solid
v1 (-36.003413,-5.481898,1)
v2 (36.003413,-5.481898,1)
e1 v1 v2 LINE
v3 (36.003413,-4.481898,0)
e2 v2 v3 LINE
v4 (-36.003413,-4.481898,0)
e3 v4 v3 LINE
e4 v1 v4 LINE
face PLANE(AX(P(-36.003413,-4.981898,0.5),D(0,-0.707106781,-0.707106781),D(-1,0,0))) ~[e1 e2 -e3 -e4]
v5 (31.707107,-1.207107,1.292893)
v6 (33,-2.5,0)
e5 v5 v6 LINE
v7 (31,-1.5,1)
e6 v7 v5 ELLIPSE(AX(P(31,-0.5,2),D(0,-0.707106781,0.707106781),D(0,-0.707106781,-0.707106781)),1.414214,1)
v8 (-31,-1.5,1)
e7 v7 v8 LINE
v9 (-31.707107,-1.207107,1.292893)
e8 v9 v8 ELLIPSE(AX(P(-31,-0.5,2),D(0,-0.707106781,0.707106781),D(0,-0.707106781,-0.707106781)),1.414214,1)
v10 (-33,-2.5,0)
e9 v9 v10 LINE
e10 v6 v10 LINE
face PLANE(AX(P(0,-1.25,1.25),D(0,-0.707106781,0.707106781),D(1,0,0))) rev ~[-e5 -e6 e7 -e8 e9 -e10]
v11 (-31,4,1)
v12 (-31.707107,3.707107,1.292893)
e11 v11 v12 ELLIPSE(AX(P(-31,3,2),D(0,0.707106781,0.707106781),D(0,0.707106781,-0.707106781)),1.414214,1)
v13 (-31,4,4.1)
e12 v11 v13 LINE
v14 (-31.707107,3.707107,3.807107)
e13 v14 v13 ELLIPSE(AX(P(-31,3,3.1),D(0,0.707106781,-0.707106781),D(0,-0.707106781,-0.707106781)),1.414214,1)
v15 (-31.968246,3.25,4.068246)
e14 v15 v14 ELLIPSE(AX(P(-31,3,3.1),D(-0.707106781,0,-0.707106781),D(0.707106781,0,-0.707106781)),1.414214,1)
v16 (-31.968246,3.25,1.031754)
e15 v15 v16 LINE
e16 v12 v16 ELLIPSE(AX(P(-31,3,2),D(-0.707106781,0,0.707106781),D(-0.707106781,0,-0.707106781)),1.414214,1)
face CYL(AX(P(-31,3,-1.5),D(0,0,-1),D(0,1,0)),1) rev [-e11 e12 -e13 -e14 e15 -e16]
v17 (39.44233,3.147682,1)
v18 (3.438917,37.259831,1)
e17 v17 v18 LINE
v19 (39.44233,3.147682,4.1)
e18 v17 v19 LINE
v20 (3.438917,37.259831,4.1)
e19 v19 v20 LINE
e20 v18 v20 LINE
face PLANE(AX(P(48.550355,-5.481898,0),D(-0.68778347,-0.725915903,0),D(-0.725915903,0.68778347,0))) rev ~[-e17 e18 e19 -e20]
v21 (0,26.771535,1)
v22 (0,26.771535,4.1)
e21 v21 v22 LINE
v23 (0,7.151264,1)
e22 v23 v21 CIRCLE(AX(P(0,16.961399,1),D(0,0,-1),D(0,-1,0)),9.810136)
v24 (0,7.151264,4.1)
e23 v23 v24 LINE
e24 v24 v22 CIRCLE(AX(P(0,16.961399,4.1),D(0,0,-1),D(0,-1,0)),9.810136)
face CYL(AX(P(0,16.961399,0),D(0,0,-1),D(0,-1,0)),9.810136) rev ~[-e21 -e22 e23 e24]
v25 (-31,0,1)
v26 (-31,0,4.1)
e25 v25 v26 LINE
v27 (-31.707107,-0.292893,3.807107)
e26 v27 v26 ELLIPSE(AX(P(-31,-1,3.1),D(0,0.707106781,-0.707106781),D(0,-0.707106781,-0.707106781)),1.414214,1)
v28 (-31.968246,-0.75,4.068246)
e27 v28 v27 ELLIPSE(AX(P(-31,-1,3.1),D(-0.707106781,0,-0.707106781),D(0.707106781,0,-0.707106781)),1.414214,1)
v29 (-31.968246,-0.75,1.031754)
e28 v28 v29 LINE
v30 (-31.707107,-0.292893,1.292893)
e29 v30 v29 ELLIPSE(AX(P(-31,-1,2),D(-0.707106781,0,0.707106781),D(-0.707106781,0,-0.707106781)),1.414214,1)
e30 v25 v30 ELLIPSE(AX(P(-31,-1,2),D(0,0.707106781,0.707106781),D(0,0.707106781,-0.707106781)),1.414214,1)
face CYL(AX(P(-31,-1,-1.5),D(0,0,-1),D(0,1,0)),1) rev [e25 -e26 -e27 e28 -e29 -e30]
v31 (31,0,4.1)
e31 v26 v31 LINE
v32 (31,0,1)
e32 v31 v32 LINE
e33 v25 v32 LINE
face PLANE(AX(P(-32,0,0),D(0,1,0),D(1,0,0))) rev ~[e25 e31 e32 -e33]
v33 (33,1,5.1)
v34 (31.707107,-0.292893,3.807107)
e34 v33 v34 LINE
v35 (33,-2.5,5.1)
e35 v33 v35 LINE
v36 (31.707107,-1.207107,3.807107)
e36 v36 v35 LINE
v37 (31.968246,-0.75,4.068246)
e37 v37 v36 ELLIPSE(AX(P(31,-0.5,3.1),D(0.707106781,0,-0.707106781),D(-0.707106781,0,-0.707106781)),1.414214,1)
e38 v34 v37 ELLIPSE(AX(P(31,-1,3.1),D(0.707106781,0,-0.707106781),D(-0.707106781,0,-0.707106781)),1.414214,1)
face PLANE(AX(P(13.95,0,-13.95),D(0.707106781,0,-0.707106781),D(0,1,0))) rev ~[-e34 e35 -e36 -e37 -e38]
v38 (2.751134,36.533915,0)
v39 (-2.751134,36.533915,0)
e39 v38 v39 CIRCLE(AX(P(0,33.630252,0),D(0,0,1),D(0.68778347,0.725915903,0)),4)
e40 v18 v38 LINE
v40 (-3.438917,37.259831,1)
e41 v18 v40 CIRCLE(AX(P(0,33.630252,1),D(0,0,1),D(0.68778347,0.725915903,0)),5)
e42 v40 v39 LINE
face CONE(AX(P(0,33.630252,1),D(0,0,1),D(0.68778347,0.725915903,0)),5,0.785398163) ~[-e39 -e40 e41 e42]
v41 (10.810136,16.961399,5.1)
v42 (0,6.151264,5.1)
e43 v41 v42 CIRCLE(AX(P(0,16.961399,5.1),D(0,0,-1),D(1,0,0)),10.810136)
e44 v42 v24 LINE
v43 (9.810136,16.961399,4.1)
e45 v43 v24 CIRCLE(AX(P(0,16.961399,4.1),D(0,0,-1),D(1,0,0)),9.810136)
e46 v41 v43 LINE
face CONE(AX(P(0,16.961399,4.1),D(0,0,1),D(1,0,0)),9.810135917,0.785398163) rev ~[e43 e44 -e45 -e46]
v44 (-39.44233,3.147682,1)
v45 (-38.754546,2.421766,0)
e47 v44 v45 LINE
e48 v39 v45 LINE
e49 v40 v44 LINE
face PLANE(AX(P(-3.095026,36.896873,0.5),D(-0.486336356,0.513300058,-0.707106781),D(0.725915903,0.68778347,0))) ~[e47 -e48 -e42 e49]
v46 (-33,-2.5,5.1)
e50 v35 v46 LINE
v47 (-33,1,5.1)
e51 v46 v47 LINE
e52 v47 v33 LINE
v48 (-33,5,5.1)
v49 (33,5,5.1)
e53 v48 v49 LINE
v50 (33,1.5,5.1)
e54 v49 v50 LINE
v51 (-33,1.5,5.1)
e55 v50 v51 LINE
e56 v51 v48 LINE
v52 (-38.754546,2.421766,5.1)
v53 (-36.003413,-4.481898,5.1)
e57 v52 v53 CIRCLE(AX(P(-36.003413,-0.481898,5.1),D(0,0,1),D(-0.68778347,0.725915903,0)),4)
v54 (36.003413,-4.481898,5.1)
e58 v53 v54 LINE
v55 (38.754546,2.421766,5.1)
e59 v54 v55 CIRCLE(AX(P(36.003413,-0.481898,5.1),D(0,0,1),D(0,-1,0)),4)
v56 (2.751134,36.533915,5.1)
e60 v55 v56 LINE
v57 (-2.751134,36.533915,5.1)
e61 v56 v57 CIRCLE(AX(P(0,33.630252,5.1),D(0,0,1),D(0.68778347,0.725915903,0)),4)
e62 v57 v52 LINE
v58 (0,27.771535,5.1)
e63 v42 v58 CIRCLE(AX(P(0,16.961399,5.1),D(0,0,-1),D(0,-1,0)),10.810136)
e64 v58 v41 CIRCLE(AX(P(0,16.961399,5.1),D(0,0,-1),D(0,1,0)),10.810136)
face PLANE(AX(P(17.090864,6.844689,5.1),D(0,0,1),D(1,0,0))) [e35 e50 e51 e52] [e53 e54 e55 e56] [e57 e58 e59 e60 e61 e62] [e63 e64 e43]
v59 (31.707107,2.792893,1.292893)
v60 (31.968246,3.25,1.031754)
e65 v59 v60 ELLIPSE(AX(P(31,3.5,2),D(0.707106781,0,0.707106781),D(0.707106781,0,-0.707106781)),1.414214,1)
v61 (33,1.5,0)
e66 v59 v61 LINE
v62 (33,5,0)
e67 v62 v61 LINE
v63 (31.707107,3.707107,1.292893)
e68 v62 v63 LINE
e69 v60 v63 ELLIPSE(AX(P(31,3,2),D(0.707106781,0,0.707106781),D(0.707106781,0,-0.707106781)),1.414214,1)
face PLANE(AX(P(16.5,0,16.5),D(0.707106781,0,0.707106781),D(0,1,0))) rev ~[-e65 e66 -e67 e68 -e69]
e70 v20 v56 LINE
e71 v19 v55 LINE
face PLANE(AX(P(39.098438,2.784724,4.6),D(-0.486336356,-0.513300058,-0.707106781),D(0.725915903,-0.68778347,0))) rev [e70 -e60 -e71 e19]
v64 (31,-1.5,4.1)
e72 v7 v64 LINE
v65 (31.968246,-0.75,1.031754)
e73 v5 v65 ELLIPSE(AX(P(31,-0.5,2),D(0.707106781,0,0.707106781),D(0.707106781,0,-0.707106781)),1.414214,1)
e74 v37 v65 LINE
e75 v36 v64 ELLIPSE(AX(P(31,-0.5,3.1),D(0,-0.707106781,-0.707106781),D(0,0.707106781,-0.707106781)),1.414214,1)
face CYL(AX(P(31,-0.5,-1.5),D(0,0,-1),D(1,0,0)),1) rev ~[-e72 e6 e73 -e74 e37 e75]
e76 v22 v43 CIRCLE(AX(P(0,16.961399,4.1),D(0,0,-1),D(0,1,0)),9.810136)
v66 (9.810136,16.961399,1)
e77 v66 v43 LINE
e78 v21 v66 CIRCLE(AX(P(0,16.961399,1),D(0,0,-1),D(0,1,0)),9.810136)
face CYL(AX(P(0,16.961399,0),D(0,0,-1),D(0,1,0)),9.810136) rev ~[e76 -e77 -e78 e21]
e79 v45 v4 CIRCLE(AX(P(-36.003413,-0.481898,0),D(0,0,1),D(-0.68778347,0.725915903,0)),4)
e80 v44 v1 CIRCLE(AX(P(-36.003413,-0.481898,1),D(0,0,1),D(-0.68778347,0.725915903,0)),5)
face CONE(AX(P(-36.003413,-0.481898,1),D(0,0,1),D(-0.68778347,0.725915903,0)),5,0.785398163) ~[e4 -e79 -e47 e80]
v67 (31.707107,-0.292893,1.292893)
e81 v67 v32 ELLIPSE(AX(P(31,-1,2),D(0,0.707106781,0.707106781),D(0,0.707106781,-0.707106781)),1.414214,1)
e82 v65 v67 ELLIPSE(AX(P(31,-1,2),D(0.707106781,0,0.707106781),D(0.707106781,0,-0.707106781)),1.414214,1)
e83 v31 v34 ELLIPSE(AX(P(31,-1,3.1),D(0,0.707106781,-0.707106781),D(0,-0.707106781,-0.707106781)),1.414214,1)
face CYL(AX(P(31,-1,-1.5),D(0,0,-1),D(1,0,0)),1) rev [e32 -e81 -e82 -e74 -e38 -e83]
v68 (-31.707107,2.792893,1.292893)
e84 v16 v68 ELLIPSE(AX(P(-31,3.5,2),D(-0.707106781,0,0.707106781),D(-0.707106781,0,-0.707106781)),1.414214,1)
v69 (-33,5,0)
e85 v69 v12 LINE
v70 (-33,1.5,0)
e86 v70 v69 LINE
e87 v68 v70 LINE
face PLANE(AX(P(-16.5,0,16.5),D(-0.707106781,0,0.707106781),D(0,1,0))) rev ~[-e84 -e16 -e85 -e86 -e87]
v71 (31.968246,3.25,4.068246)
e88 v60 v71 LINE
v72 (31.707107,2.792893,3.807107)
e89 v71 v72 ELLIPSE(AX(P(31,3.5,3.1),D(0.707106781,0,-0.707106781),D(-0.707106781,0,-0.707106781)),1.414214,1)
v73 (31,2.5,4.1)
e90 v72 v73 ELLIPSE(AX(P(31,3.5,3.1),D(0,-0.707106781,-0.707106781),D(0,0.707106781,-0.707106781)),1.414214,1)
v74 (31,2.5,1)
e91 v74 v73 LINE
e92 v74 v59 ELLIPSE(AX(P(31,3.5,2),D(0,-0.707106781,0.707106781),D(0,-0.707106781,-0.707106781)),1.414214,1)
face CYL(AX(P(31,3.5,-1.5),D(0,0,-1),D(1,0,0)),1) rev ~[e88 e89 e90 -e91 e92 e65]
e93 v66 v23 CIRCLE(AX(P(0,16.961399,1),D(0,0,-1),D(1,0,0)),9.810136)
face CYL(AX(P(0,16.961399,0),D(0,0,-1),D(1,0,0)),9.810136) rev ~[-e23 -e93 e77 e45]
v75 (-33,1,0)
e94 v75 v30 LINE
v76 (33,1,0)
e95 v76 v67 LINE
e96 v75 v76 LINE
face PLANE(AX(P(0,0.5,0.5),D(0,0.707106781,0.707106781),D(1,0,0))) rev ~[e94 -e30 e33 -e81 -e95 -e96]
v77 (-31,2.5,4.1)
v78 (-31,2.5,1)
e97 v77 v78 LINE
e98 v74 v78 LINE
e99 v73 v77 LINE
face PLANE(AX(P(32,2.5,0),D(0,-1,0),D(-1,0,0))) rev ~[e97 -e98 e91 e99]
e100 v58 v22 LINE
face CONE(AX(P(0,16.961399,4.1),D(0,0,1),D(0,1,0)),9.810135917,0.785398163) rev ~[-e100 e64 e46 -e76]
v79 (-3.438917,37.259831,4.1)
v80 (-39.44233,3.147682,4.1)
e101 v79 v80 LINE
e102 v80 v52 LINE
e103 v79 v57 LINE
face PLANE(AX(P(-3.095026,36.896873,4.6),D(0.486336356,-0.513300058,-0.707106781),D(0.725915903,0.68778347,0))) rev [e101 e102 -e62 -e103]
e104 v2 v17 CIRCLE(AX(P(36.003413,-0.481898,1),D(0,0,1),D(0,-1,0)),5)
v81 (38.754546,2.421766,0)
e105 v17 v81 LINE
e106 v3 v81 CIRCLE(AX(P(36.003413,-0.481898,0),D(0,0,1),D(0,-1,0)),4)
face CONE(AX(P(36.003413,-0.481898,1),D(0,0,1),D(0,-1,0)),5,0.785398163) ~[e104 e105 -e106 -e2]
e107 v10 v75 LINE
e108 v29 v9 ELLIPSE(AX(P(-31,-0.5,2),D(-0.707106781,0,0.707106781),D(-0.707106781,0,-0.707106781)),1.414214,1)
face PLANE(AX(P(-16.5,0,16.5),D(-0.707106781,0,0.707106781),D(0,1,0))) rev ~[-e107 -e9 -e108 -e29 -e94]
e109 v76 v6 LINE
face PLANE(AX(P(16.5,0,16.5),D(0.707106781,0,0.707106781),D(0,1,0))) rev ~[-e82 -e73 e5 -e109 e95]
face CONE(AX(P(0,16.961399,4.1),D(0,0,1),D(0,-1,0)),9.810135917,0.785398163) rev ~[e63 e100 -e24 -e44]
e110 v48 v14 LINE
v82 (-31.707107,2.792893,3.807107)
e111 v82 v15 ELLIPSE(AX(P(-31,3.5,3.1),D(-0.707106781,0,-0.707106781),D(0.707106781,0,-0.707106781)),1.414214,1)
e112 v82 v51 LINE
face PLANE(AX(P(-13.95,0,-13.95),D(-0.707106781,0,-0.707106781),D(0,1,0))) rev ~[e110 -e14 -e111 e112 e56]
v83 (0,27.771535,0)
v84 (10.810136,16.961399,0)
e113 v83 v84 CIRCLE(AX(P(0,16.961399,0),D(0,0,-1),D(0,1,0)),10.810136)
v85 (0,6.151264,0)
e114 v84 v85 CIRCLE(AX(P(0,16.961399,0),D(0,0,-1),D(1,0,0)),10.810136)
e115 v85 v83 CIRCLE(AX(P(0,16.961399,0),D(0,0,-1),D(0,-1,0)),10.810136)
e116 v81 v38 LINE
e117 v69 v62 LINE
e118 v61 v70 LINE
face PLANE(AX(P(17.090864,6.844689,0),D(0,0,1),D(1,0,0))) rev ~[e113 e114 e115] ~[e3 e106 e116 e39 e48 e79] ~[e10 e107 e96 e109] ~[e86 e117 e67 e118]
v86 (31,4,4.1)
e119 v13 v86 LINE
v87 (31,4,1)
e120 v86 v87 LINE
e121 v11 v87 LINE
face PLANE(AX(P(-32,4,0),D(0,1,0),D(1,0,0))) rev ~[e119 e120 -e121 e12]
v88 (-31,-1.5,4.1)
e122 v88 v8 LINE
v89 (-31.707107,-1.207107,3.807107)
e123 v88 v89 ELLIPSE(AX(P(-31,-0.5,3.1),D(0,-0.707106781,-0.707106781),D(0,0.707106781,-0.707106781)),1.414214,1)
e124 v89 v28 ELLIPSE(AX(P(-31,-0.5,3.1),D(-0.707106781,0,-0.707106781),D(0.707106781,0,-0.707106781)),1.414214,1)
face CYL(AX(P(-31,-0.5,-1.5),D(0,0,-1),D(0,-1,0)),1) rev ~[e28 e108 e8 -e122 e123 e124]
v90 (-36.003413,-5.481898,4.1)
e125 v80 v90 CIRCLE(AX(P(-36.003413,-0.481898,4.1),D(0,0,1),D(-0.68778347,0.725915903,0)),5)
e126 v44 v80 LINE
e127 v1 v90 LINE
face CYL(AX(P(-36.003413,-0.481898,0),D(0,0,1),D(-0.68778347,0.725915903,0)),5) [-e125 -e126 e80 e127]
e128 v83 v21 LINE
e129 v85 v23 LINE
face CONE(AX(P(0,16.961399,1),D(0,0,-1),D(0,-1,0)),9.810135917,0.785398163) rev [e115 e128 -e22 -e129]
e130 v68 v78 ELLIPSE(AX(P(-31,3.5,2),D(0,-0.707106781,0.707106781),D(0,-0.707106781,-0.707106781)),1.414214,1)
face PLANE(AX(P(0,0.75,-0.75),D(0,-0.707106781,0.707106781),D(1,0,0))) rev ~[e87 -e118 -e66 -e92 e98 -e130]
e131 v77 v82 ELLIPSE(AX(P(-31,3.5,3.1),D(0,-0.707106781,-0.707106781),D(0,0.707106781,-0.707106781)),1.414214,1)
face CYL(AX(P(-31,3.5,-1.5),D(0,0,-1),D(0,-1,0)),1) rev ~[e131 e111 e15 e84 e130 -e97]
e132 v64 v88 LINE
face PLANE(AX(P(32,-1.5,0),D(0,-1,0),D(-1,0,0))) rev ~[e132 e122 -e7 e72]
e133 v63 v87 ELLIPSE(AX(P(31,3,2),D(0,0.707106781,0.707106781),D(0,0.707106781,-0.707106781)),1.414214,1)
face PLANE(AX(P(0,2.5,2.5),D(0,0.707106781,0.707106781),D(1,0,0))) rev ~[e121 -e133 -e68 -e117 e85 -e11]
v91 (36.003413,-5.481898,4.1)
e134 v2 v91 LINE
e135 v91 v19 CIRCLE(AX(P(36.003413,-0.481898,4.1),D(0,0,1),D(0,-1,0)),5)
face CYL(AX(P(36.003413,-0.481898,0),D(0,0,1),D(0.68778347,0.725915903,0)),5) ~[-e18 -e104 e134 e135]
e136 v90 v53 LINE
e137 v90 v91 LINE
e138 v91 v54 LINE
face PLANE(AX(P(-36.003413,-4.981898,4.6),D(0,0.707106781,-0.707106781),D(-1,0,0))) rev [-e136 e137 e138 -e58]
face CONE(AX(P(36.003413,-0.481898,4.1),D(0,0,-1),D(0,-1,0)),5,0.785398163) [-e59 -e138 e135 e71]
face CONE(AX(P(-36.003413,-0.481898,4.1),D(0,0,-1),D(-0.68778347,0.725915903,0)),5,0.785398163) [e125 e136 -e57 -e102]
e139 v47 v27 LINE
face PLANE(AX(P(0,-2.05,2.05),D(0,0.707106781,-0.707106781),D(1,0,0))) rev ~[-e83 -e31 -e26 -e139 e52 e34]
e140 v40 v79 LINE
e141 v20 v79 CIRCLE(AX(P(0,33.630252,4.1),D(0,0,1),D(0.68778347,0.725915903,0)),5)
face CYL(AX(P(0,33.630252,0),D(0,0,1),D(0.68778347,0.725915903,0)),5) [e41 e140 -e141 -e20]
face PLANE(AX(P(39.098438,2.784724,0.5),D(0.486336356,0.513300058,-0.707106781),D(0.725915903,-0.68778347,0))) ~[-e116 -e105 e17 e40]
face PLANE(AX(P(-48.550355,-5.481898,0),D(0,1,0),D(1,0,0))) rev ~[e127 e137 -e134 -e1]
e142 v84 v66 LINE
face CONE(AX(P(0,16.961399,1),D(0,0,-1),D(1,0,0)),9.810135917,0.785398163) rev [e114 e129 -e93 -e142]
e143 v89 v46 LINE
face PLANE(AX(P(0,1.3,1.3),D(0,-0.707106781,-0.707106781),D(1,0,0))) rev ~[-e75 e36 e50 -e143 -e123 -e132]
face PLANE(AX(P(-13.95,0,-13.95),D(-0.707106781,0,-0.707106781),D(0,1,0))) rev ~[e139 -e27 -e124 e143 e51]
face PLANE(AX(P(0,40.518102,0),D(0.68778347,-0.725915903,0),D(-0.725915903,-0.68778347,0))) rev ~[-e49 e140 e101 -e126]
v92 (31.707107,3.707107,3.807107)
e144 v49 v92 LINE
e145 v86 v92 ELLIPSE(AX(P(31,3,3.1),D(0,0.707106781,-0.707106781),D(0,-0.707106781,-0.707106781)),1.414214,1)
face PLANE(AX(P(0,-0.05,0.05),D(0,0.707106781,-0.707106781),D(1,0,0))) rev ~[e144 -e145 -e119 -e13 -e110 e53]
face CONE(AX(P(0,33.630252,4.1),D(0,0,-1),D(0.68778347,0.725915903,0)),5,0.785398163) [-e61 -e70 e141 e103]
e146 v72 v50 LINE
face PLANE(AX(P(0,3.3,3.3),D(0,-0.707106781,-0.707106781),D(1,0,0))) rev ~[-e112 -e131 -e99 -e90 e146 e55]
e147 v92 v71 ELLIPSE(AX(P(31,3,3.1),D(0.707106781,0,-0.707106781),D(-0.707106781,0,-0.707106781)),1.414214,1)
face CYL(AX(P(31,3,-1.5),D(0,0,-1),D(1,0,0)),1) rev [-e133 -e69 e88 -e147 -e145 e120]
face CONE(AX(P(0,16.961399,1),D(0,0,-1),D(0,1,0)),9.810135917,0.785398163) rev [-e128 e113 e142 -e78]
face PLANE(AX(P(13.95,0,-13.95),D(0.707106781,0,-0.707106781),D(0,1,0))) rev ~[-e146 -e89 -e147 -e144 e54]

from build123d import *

# Parameters (mm, degrees)
F1_DEPTH      = 5.1
F2_R          = 5
F3_SIZE       = 1
F4_T4_DEPTH   = 8.1
F4_T10_DEPTH  = 8.1
F4_T16_DEPTH  = 8.1
F4_T24_DEPTH  = 8.1
F4_T30_DEPTH  = 8.1
F4_T36_DEPTH  = 8.1
F4_T42_DEPTH  = 8.1
F4_T48_DEPTH  = 8.1
F4_T56_DEPTH  = 8.1
F4_T62_DEPTH  = 8.1
F4_T68_DEPTH  = 8.1
F4_T74_DEPTH  = 8.1
F4_T80_DEPTH  = 8.1
F4_T88_DEPTH  = 8.1
F4_T94_DEPTH  = 8.1
F4_T100_DEPTH = 8.1
F4_T106_DEPTH = 8.1
F4_T112_DEPTH = 8.1
F4_T120_DEPTH = 8.1
F4_T126_DEPTH = 8.1
F4_T132_DEPTH = 8.1
F4_T138_DEPTH = 8.1
F4_T144_DEPTH = 8.1
F4_T152_DEPTH = 8.1
F4_T158_DEPTH = 8.1
F4_T164_DEPTH = 8.1
F4_T170_DEPTH = 8.1
F4_T176_DEPTH = 8.1
F4_T184_DEPTH = 8.1
F4_T190_DEPTH = 8.1
F4_T196_DEPTH = 8.1
F4_T202_DEPTH = 8.1
F4_T208_DEPTH = 8.1
F4_T216_DEPTH = 8.1
F4_T222_DEPTH = 8.1
F4_T228_DEPTH = 8.1
F4_T234_DEPTH = 8.1
F4_T240_DEPTH = 8.1
F4_T248_DEPTH = 8.1
F4_T254_DEPTH = 8.1


# Not quite as in the source:
# - a fillet or chamfer that OpenCascade refuses, or shapes differently, is made with other operations: its cross-section is extruded or revolved along the edge and cut away or added


with BuildPart() as f1:
    # F0 (on Top) → F1 (new body)
    with BuildSketch(Plane.XY):
        with BuildLine():
            Line((0, 2.5), (0, 0))
            Line((0, 0), (32, 0))
            Line((32, 0), (32, -1.5))
            Line((32, -1.5), (0, -1.5))
            Line((0, -1.5), (0, -5.4818979414))
            Line((0, -5.4818979414), (48.5503548798, -5.4818979414))
            Line((48.5503548798, -5.4818979414), (0, 40.5181020586))
            Line((0, 40.5181020586), (0, 26.7715353826))
            ThreePointArc((0, 26.7715353826), (6.9368136311, 23.8982130969), (9.8101359168, 16.9613994658))
            ThreePointArc((9.8101359168, 16.9613994658), (6.9368136311, 10.0245858347), (0, 7.151263549))
            Line((0, 7.151263549), (0, 4))
            Line((0, 4), (32, 4))
            Line((32, 4), (32, 2.5))
            Line((32, 2.5), (0, 2.5))
        make_face()
        with BuildLine():
            Line((-32, -1.5), (-32, 0))
            Line((-32, 0), (0, 0))
            Line((0, 0), (0, 2.5))
            Line((0, 2.5), (-32, 2.5))
            Line((-32, 2.5), (-32, 4))
            Line((-32, 4), (0, 4))
            Line((0, 4), (0, 7.151263549))
            ThreePointArc((0, 7.151263549), (-9.8101359168, 16.9613994658), (0, 26.7715353826))
            Line((0, 26.7715353826), (0, 40.5181020586))
            Line((0, 40.5181020586), (-48.5503548798, -5.4818979414))
            Line((-48.5503548798, -5.4818979414), (0, -5.4818979414))
            Line((0, -5.4818979414), (0, -1.5))
            Line((0, -1.5), (-32, -1.5))
        make_face()
    extrude(amount=F1_DEPTH)

    # F2
    f2_edges = [f1.edges().sort_by_distance(p)[0] for p in [
        (-48.550355, -5.481898, 2.55),
        (48.550355, -5.481898, 2.55),
        (0, 40.518102, 2.55),
    ]]
    fillet(f2_edges, radius=F2_R)

    # F3
    f3_edges = [f1.edges().sort_by_distance(p)[0] for p in [
        (21.440624, 20.203756, 5.1),
        (40.648189, -2.332857, 5.1),
        (0, 38.630252, 5.1),
        (0, -5.481898, 5.1),
        (-21.440624, 20.203756, 5.1),
        (-40.648189, -2.332857, 5.1),
        (32, 3.25, 5.1),
        (0, 2.5, 5.1),
        (-32, 3.25, 5.1),
        (0, 4, 5.1),
        (32, -0.75, 5.1),
        (0, -1.5, 5.1),
        (-32, -0.75, 5.1),
        (0, 0, 5.1),
        (-9.810136, 16.961399, 5.1),
        (21.440624, 20.203756, 0),
        (40.648189, -2.332857, 0),
        (0, 38.630252, 0),
        (0, -5.481898, 0),
        (-21.440624, 20.203756, 0),
        (-40.648189, -2.332857, 0),
        (32, 3.25, 0),
        (0, 2.5, 0),
        (-32, 3.25, 0),
        (0, 4, 0),
        (32, -0.75, 0),
        (0, -1.5, 0),
        (-32, -0.75, 0),
        (0, 0, 0),
        (-9.810136, 16.961399, 0),
    ]]
    chamfer(f3_edges, length=F3_SIZE)

    # F4: fillet of radius 1 on 8 edges, made by hand


with BuildPart() as f4_tool2:
    # F4_s3 → F4_t4 (new body)
    with BuildSketch(Plane.XY.offset(-1.5)):
        with BuildLine():
            ThreePointArc((32, 3.5), (31.7071067812, 2.7928932188), (31, 2.5))
            Line((31, 2.5), (32, 2.5))
            Line((32, 2.5), (32, 3.5))
        make_face()
    extrude(amount=F4_T4_DEPTH)

    split(bisect_by=Plane(origin=(16.5, 0, 16.5), x_dir=(0, 1, 0), z_dir=(-0.7071067812, 0, -0.7071067812)), keep=Keep.TOP)

    split(bisect_by=Plane(origin=(0, 0.75, -0.75), x_dir=(1, 0, 0), z_dir=(0, -0.7071067812, 0.7071067812)), keep=Keep.TOP)


with BuildPart() as f1_1:
    add(f1.part)

    # F4_t1: union F4_tool2
    add(f4_tool2.part)


with BuildPart() as f4_tool8:
    # F4_s9 → F4_t10 (new body)
    with BuildSketch(Plane.XY.offset(-1.5)):
        with BuildLine():
            ThreePointArc((32, 3.5), (31.7071067812, 2.7928932188), (31, 2.5))
            Line((31, 2.5), (32, 2.5))
            Line((32, 2.5), (32, 3.5))
        make_face()
    extrude(amount=F4_T10_DEPTH)

    split(bisect_by=Plane(origin=(16.5, 0, 16.5), x_dir=(0, 1, 0), z_dir=(0.7071067812, 0, 0.7071067812)), keep=Keep.TOP)

    split(bisect_by=Plane(origin=(0, 0.75, -0.75), x_dir=(1, 0, 0), z_dir=(0, 0.7071067812, -0.7071067812)), keep=Keep.TOP)


with BuildPart() as f1_2:
    add(f1_1.part)

    # F4_t7: union F4_tool8
    add(f4_tool8.part)


with BuildPart() as f4_tool14:
    # F4_s15 → F4_t16 (new body)
    with BuildSketch(Plane.XY.offset(-1.5)):
        with BuildLine():
            ThreePointArc((32, 3.5), (31.7071067812, 2.7928932188), (31, 2.5))
            Line((31, 2.5), (32, 2.5))
            Line((32, 2.5), (32, 3.5))
        make_face()
    extrude(amount=F4_T16_DEPTH)

    split(bisect_by=Plane(origin=(16.5, 0, 16.5), x_dir=(0, 1, 0), z_dir=(0.7071067812, 0, 0.7071067812)), keep=Keep.TOP)

    split(bisect_by=Plane(origin=(0, 0.75, -0.75), x_dir=(1, 0, 0), z_dir=(0, -0.7071067812, 0.7071067812)), keep=Keep.TOP)

    split(bisect_by=Plane(origin=(13.95, 0, -13.95), x_dir=(0, 1, 0), z_dir=(0.7071067812, 0, -0.7071067812)), keep=Keep.TOP)

    split(bisect_by=Plane(origin=(0, 3.3, 3.3), x_dir=(1, 0, 0), z_dir=(0, -0.7071067812, -0.7071067812)), keep=Keep.TOP)


with BuildPart() as f1_3:
    add(f1_2.part)

    # F4_t13: union F4_tool14
    add(f4_tool14.part)


with BuildPart() as f4_tool22:
    # F4_s23 → F4_t24 (new body)
    with BuildSketch(Plane.XY.offset(-1.5)):
        with BuildLine():
            ThreePointArc((32, 3.5), (31.7071067812, 2.7928932188), (31, 2.5))
            Line((31, 2.5), (32, 2.5))
            Line((32, 2.5), (32, 3.5))
        make_face()
    extrude(amount=F4_T24_DEPTH)

    split(bisect_by=Plane(origin=(13.95, 0, -13.95), x_dir=(0, 1, 0), z_dir=(-0.7071067812, 0, 0.7071067812)), keep=Keep.TOP)

    split(bisect_by=Plane(origin=(0, 3.3, 3.3), x_dir=(1, 0, 0), z_dir=(0, -0.7071067812, -0.7071067812)), keep=Keep.TOP)


with BuildPart() as f1_4:
    add(f1_3.part)

    # F4_t21: union F4_tool22
    add(f4_tool22.part)


with BuildPart() as f4_tool28:
    # F4_s29 → F4_t30 (new body)
    with BuildSketch(Plane.XY.offset(-1.5)):
        with BuildLine():
            ThreePointArc((32, 3.5), (31.7071067812, 2.7928932188), (31, 2.5))
            Line((31, 2.5), (32, 2.5))
            Line((32, 2.5), (32, 3.5))
        make_face()
    extrude(amount=F4_T30_DEPTH)

    split(bisect_by=Plane(origin=(13.95, 0, -13.95), x_dir=(0, 1, 0), z_dir=(0.7071067812, 0, -0.7071067812)), keep=Keep.TOP)

    split(bisect_by=Plane(origin=(0, 3.3, 3.3), x_dir=(1, 0, 0), z_dir=(0, 0.7071067812, 0.7071067812)), keep=Keep.TOP)


with BuildPart() as f1_5:
    add(f1_4.part)

    # F4_t27: union F4_tool28
    add(f4_tool28.part)


with BuildPart() as f4_tool34:
    # F4_s35 → F4_t36 (new body)
    with BuildSketch(Plane.XY.offset(-1.5)):
        with BuildLine():
            ThreePointArc((32, -1), (31.7071067812, -0.2928932188), (31, 0))
            Line((31, 0), (32, 0))
            Line((32, 0), (32, -1))
        make_face()
    extrude(amount=F4_T36_DEPTH)

    split(bisect_by=Plane(origin=(16.5, 0, 16.5), x_dir=(0, 1, 0), z_dir=(-0.7071067812, 0, -0.7071067812)), keep=Keep.TOP)

    split(bisect_by=Plane(origin=(0, 0.5, 0.5), x_dir=(1, 0, 0), z_dir=(0, 0.7071067812, 0.7071067812)), keep=Keep.TOP)


with BuildPart() as f1_6:
    add(f1_5.part)

    # F4_t33: union F4_tool34
    add(f4_tool34.part)


with BuildPart() as f4_tool40:
    # F4_s41 → F4_t42 (new body)
    with BuildSketch(Plane.XY.offset(-1.5)):
        with BuildLine():
            ThreePointArc((32, -1), (31.7071067812, -0.2928932188), (31, 0))
            Line((31, 0), (32, 0))
            Line((32, 0), (32, -1))
        make_face()
    extrude(amount=F4_T42_DEPTH)

    split(bisect_by=Plane(origin=(16.5, 0, 16.5), x_dir=(0, 1, 0), z_dir=(0.7071067812, 0, 0.7071067812)), keep=Keep.TOP)

    split(bisect_by=Plane(origin=(0, 0.5, 0.5), x_dir=(1, 0, 0), z_dir=(0, -0.7071067812, -0.7071067812)), keep=Keep.TOP)


with BuildPart() as f1_7:
    add(f1_6.part)

    # F4_t39: union F4_tool40
    add(f4_tool40.part)


with BuildPart() as f4_tool46:
    # F4_s47 → F4_t48 (new body)
    with BuildSketch(Plane.XY.offset(-1.5)):
        with BuildLine():
            ThreePointArc((32, -1), (31.7071067812, -0.2928932188), (31, 0))
            Line((31, 0), (32, 0))
            Line((32, 0), (32, -1))
        make_face()
    extrude(amount=F4_T48_DEPTH)

    split(bisect_by=Plane(origin=(16.5, 0, 16.5), x_dir=(0, 1, 0), z_dir=(0.7071067812, 0, 0.7071067812)), keep=Keep.TOP)

    split(bisect_by=Plane(origin=(0, 0.5, 0.5), x_dir=(1, 0, 0), z_dir=(0, 0.7071067812, 0.7071067812)), keep=Keep.TOP)

    split(bisect_by=Plane(origin=(13.95, 0, -13.95), x_dir=(0, 1, 0), z_dir=(0.7071067812, 0, -0.7071067812)), keep=Keep.TOP)

    split(bisect_by=Plane(origin=(0, -2.05, 2.05), x_dir=(1, 0, 0), z_dir=(0, 0.7071067812, -0.7071067812)), keep=Keep.TOP)


with BuildPart() as f1_8:
    add(f1_7.part)

    # F4_t45: union F4_tool46
    add(f4_tool46.part)


with BuildPart() as f4_tool54:
    # F4_s55 → F4_t56 (new body)
    with BuildSketch(Plane.XY.offset(-1.5)):
        with BuildLine():
            ThreePointArc((32, -1), (31.7071067812, -0.2928932188), (31, 0))
            Line((31, 0), (32, 0))
            Line((32, 0), (32, -1))
        make_face()
    extrude(amount=F4_T56_DEPTH)

    split(bisect_by=Plane(origin=(13.95, 0, -13.95), x_dir=(0, 1, 0), z_dir=(-0.7071067812, 0, 0.7071067812)), keep=Keep.TOP)

    split(bisect_by=Plane(origin=(0, -2.05, 2.05), x_dir=(1, 0, 0), z_dir=(0, 0.7071067812, -0.7071067812)), keep=Keep.TOP)


with BuildPart() as f1_9:
    add(f1_8.part)

    # F4_t53: union F4_tool54
    add(f4_tool54.part)


with BuildPart() as f4_tool60:
    # F4_s61 → F4_t62 (new body)
    with BuildSketch(Plane.XY.offset(-1.5)):
        with BuildLine():
            ThreePointArc((32, -1), (31.7071067812, -0.2928932188), (31, 0))
            Line((31, 0), (32, 0))
            Line((32, 0), (32, -1))
        make_face()
    extrude(amount=F4_T62_DEPTH)

    split(bisect_by=Plane(origin=(13.95, 0, -13.95), x_dir=(0, 1, 0), z_dir=(0.7071067812, 0, -0.7071067812)), keep=Keep.TOP)

    split(bisect_by=Plane(origin=(0, -2.05, 2.05), x_dir=(1, 0, 0), z_dir=(0, -0.7071067812, 0.7071067812)), keep=Keep.TOP)


with BuildPart() as f1_10:
    add(f1_9.part)

    # F4_t59: union F4_tool60
    add(f4_tool60.part)


with BuildPart() as f4_tool66:
    # F4_s67 → F4_t68 (new body)
    with BuildSketch(Plane.XY.offset(-1.5)):
        with BuildLine():
            ThreePointArc((32, -0.5), (31.7071067812, -1.2071067812), (31, -1.5))
            Line((31, -1.5), (32, -1.5))
            Line((32, -1.5), (32, -0.5))
        make_face()
    extrude(amount=F4_T68_DEPTH)

    split(bisect_by=Plane(origin=(16.5, 0, 16.5), x_dir=(0, 1, 0), z_dir=(-0.7071067812, 0, -0.7071067812)), keep=Keep.TOP)

    split(bisect_by=Plane(origin=(0, -1.25, 1.25), x_dir=(1, 0, 0), z_dir=(0, -0.7071067812, 0.7071067812)), keep=Keep.TOP)


with BuildPart() as f1_11:
    add(f1_10.part)

    # F4_t65: union F4_tool66
    add(f4_tool66.part)


with BuildPart() as f4_tool72:
    # F4_s73 → F4_t74 (new body)
    with BuildSketch(Plane.XY.offset(-1.5)):
        with BuildLine():
            ThreePointArc((32, -0.5), (31.7071067812, -1.2071067812), (31, -1.5))
            Line((31, -1.5), (32, -1.5))
            Line((32, -1.5), (32, -0.5))
        make_face()
    extrude(amount=F4_T74_DEPTH)

    split(bisect_by=Plane(origin=(16.5, 0, 16.5), x_dir=(0, 1, 0), z_dir=(0.7071067812, 0, 0.7071067812)), keep=Keep.TOP)

    split(bisect_by=Plane(origin=(0, -1.25, 1.25), x_dir=(1, 0, 0), z_dir=(0, 0.7071067812, -0.7071067812)), keep=Keep.TOP)


with BuildPart() as f1_12:
    add(f1_11.part)

    # F4_t71: union F4_tool72
    add(f4_tool72.part)


with BuildPart() as f4_tool78:
    # F4_s79 → F4_t80 (new body)
    with BuildSketch(Plane.XY.offset(-1.5)):
        with BuildLine():
            ThreePointArc((32, -0.5), (31.7071067812, -1.2071067812), (31, -1.5))
            Line((31, -1.5), (32, -1.5))
            Line((32, -1.5), (32, -0.5))
        make_face()
    extrude(amount=F4_T80_DEPTH)

    split(bisect_by=Plane(origin=(16.5, 0, 16.5), x_dir=(0, 1, 0), z_dir=(0.7071067812, 0, 0.7071067812)), keep=Keep.TOP)

    split(bisect_by=Plane(origin=(0, -1.25, 1.25), x_dir=(1, 0, 0), z_dir=(0, -0.7071067812, 0.7071067812)), keep=Keep.TOP)

    split(bisect_by=Plane(origin=(13.95, 0, -13.95), x_dir=(0, 1, 0), z_dir=(0.7071067812, 0, -0.7071067812)), keep=Keep.TOP)

    split(bisect_by=Plane(origin=(0, 1.3, 1.3), x_dir=(1, 0, 0), z_dir=(0, -0.7071067812, -0.7071067812)), keep=Keep.TOP)


with BuildPart() as f1_13:
    add(f1_12.part)

    # F4_t77: union F4_tool78
    add(f4_tool78.part)


with BuildPart() as f4_tool86:
    # F4_s87 → F4_t88 (new body)
    with BuildSketch(Plane.XY.offset(-1.5)):
        with BuildLine():
            ThreePointArc((32, -0.5), (31.7071067812, -1.2071067812), (31, -1.5))
            Line((31, -1.5), (32, -1.5))
            Line((32, -1.5), (32, -0.5))
        make_face()
    extrude(amount=F4_T88_DEPTH)

    split(bisect_by=Plane(origin=(13.95, 0, -13.95), x_dir=(0, 1, 0), z_dir=(-0.7071067812, 0, 0.7071067812)), keep=Keep.TOP)

    split(bisect_by=Plane(origin=(0, 1.3, 1.3), x_dir=(1, 0, 0), z_dir=(0, -0.7071067812, -0.7071067812)), keep=Keep.TOP)


with BuildPart() as f1_14:
    add(f1_13.part)

    # F4_t85: union F4_tool86
    add(f4_tool86.part)


with BuildPart() as f4_tool92:
    # F4_s93 → F4_t94 (new body)
    with BuildSketch(Plane.XY.offset(-1.5)):
        with BuildLine():
            ThreePointArc((32, -0.5), (31.7071067812, -1.2071067812), (31, -1.5))
            Line((31, -1.5), (32, -1.5))
            Line((32, -1.5), (32, -0.5))
        make_face()
    extrude(amount=F4_T94_DEPTH)

    split(bisect_by=Plane(origin=(13.95, 0, -13.95), x_dir=(0, 1, 0), z_dir=(0.7071067812, 0, -0.7071067812)), keep=Keep.TOP)

    split(bisect_by=Plane(origin=(0, 1.3, 1.3), x_dir=(1, 0, 0), z_dir=(0, 0.7071067812, 0.7071067812)), keep=Keep.TOP)


with BuildPart() as f1_15:
    add(f1_14.part)

    # F4_t91: union F4_tool92
    add(f4_tool92.part)


with BuildPart() as f4_tool98:
    # F4_s99 → F4_t100 (new body)
    with BuildSketch(Plane.XY.offset(-1.5)):
        with BuildLine():
            ThreePointArc((32, 3), (31.7071067812, 3.7071067812), (31, 4))
            Line((31, 4), (32, 4))
            Line((32, 4), (32, 3))
        make_face()
    extrude(amount=F4_T100_DEPTH)

    split(bisect_by=Plane(origin=(16.5, 0, 16.5), x_dir=(0, 1, 0), z_dir=(-0.7071067812, 0, -0.7071067812)), keep=Keep.TOP)

    split(bisect_by=Plane(origin=(0, 2.5, 2.5), x_dir=(1, 0, 0), z_dir=(0, 0.7071067812, 0.7071067812)), keep=Keep.TOP)


with BuildPart() as f1_16:
    add(f1_15.part)

    # F4_t97: union F4_tool98
    add(f4_tool98.part)


with BuildPart() as f4_tool104:
    # F4_s105 → F4_t106 (new body)
    with BuildSketch(Plane.XY.offset(-1.5)):
        with BuildLine():
            ThreePointArc((32, 3), (31.7071067812, 3.7071067812), (31, 4))
            Line((31, 4), (32, 4))
            Line((32, 4), (32, 3))
        make_face()
    extrude(amount=F4_T106_DEPTH)

    split(bisect_by=Plane(origin=(16.5, 0, 16.5), x_dir=(0, 1, 0), z_dir=(0.7071067812, 0, 0.7071067812)), keep=Keep.TOP)

    split(bisect_by=Plane(origin=(0, 2.5, 2.5), x_dir=(1, 0, 0), z_dir=(0, -0.7071067812, -0.7071067812)), keep=Keep.TOP)


with BuildPart() as f1_17:
    add(f1_16.part)

    # F4_t103: union F4_tool104
    add(f4_tool104.part)


with BuildPart() as f4_tool110:
    # F4_s111 → F4_t112 (new body)
    with BuildSketch(Plane.XY.offset(-1.5)):
        with BuildLine():
            ThreePointArc((32, 3), (31.7071067812, 3.7071067812), (31, 4))
            Line((31, 4), (32, 4))
            Line((32, 4), (32, 3))
        make_face()
    extrude(amount=F4_T112_DEPTH)

    split(bisect_by=Plane(origin=(16.5, 0, 16.5), x_dir=(0, 1, 0), z_dir=(0.7071067812, 0, 0.7071067812)), keep=Keep.TOP)

    split(bisect_by=Plane(origin=(0, 2.5, 2.5), x_dir=(1, 0, 0), z_dir=(0, 0.7071067812, 0.7071067812)), keep=Keep.TOP)

    split(bisect_by=Plane(origin=(13.95, 0, -13.95), x_dir=(0, 1, 0), z_dir=(0.7071067812, 0, -0.7071067812)), keep=Keep.TOP)

    split(bisect_by=Plane(origin=(0, -0.05, 0.05), x_dir=(1, 0, 0), z_dir=(0, 0.7071067812, -0.7071067812)), keep=Keep.TOP)


with BuildPart() as f1_18:
    add(f1_17.part)

    # F4_t109: union F4_tool110
    add(f4_tool110.part)


with BuildPart() as f4_tool118:
    # F4_s119 → F4_t120 (new body)
    with BuildSketch(Plane.XY.offset(-1.5)):
        with BuildLine():
            ThreePointArc((32, 3), (31.7071067812, 3.7071067812), (31, 4))
            Line((31, 4), (32, 4))
            Line((32, 4), (32, 3))
        make_face()
    extrude(amount=F4_T120_DEPTH)

    split(bisect_by=Plane(origin=(13.95, 0, -13.95), x_dir=(0, 1, 0), z_dir=(-0.7071067812, 0, 0.7071067812)), keep=Keep.TOP)

    split(bisect_by=Plane(origin=(0, -0.05, 0.05), x_dir=(1, 0, 0), z_dir=(0, 0.7071067812, -0.7071067812)), keep=Keep.TOP)


with BuildPart() as f1_19:
    add(f1_18.part)

    # F4_t117: union F4_tool118
    add(f4_tool118.part)


with BuildPart() as f4_tool124:
    # F4_s125 → F4_t126 (new body)
    with BuildSketch(Plane.XY.offset(-1.5)):
        with BuildLine():
            ThreePointArc((32, 3), (31.7071067812, 3.7071067812), (31, 4))
            Line((31, 4), (32, 4))
            Line((32, 4), (32, 3))
        make_face()
    extrude(amount=F4_T126_DEPTH)

    split(bisect_by=Plane(origin=(13.95, 0, -13.95), x_dir=(0, 1, 0), z_dir=(0.7071067812, 0, -0.7071067812)), keep=Keep.TOP)

    split(bisect_by=Plane(origin=(0, -0.05, 0.05), x_dir=(1, 0, 0), z_dir=(0, -0.7071067812, 0.7071067812)), keep=Keep.TOP)


with BuildPart() as f1_20:
    add(f1_19.part)

    # F4_t123: union F4_tool124
    add(f4_tool124.part)


with BuildPart() as f4_tool130:
    # F4_s131 → F4_t132 (new body)
    with BuildSketch(Plane.XY.offset(-1.5)):
        with BuildLine():
            ThreePointArc((-31, -1.5), (-31.7071067812, -1.2071067812), (-32, -0.5))
            Line((-32, -0.5), (-32, -1.5))
            Line((-32, -1.5), (-31, -1.5))
        make_face()
    extrude(amount=F4_T132_DEPTH)

    split(bisect_by=Plane(origin=(0, -1.25, 1.25), x_dir=(1, 0, 0), z_dir=(0, 0.7071067812, -0.7071067812)), keep=Keep.TOP)

    split(bisect_by=Plane(origin=(-16.5, 0, 16.5), x_dir=(0, 1, 0), z_dir=(-0.7071067812, 0, 0.7071067812)), keep=Keep.TOP)


with BuildPart() as f1_21:
    add(f1_20.part)

    # F4_t129: union F4_tool130
    add(f4_tool130.part)


with BuildPart() as f4_tool136:
    # F4_s137 → F4_t138 (new body)
    with BuildSketch(Plane.XY.offset(-1.5)):
        with BuildLine():
            ThreePointArc((-31, -1.5), (-31.7071067812, -1.2071067812), (-32, -0.5))
            Line((-32, -0.5), (-32, -1.5))
            Line((-32, -1.5), (-31, -1.5))
        make_face()
    extrude(amount=F4_T138_DEPTH)

    split(bisect_by=Plane(origin=(0, -1.25, 1.25), x_dir=(1, 0, 0), z_dir=(0, -0.7071067812, 0.7071067812)), keep=Keep.TOP)

    split(bisect_by=Plane(origin=(-16.5, 0, 16.5), x_dir=(0, 1, 0), z_dir=(0.7071067812, 0, -0.7071067812)), keep=Keep.TOP)


with BuildPart() as f1_22:
    add(f1_21.part)

    # F4_t135: union F4_tool136
    add(f4_tool136.part)


with BuildPart() as f4_tool142:
    # F4_s143 → F4_t144 (new body)
    with BuildSketch(Plane.XY.offset(-1.5)):
        with BuildLine():
            ThreePointArc((-31, -1.5), (-31.7071067812, -1.2071067812), (-32, -0.5))
            Line((-32, -0.5), (-32, -1.5))
            Line((-32, -1.5), (-31, -1.5))
        make_face()
    extrude(amount=F4_T144_DEPTH)

    split(bisect_by=Plane(origin=(0, -1.25, 1.25), x_dir=(1, 0, 0), z_dir=(0, -0.7071067812, 0.7071067812)), keep=Keep.TOP)

    split(bisect_by=Plane(origin=(-16.5, 0, 16.5), x_dir=(0, 1, 0), z_dir=(-0.7071067812, 0, 0.7071067812)), keep=Keep.TOP)

    split(bisect_by=Plane(origin=(0, 1.3, 1.3), x_dir=(1, 0, 0), z_dir=(0, -0.7071067812, -0.7071067812)), keep=Keep.TOP)

    split(bisect_by=Plane(origin=(-13.95, 0, -13.95), x_dir=(0, 1, 0), z_dir=(-0.7071067812, 0, -0.7071067812)), keep=Keep.TOP)


with BuildPart() as f1_23:
    add(f1_22.part)

    # F4_t141: union F4_tool142
    add(f4_tool142.part)


with BuildPart() as f4_tool150:
    # F4_s151 → F4_t152 (new body)
    with BuildSketch(Plane.XY.offset(-1.5)):
        with BuildLine():
            ThreePointArc((-31, -1.5), (-31.7071067812, -1.2071067812), (-32, -0.5))
            Line((-32, -0.5), (-32, -1.5))
            Line((-32, -1.5), (-31, -1.5))
        make_face()
    extrude(amount=F4_T152_DEPTH)

    split(bisect_by=Plane(origin=(0, 1.3, 1.3), x_dir=(1, 0, 0), z_dir=(0, 0.7071067812, 0.7071067812)), keep=Keep.TOP)

    split(bisect_by=Plane(origin=(-13.95, 0, -13.95), x_dir=(0, 1, 0), z_dir=(-0.7071067812, 0, -0.7071067812)), keep=Keep.TOP)


with BuildPart() as f1_24:
    add(f1_23.part)

    # F4_t149: union F4_tool150
    add(f4_tool150.part)


with BuildPart() as f4_tool156:
    # F4_s157 → F4_t158 (new body)
    with BuildSketch(Plane.XY.offset(-1.5)):
        with BuildLine():
            ThreePointArc((-31, -1.5), (-31.7071067812, -1.2071067812), (-32, -0.5))
            Line((-32, -0.5), (-32, -1.5))
            Line((-32, -1.5), (-31, -1.5))
        make_face()
    extrude(amount=F4_T158_DEPTH)

    split(bisect_by=Plane(origin=(0, 1.3, 1.3), x_dir=(1, 0, 0), z_dir=(0, -0.7071067812, -0.7071067812)), keep=Keep.TOP)

    split(bisect_by=Plane(origin=(-13.95, 0, -13.95), x_dir=(0, 1, 0), z_dir=(0.7071067812, 0, 0.7071067812)), keep=Keep.TOP)


with BuildPart() as f1_25:
    add(f1_24.part)

    # F4_t155: union F4_tool156
    add(f4_tool156.part)


with BuildPart() as f4_tool162:
    # F4_s163 → F4_t164 (new body)
    with BuildSketch(Plane.XY.offset(-1.5)):
        with BuildLine():
            ThreePointArc((-31, 2.5), (-31.7071067812, 2.7928932188), (-32, 3.5))
            Line((-32, 3.5), (-32, 2.5))
            Line((-32, 2.5), (-31, 2.5))
        make_face()
    extrude(amount=F4_T164_DEPTH)

    split(bisect_by=Plane(origin=(0, 0.75, -0.75), x_dir=(1, 0, 0), z_dir=(0, 0.7071067812, -0.7071067812)), keep=Keep.TOP)

    split(bisect_by=Plane(origin=(-16.5, 0, 16.5), x_dir=(0, 1, 0), z_dir=(-0.7071067812, 0, 0.7071067812)), keep=Keep.TOP)


with BuildPart() as f1_26:
    add(f1_25.part)

    # F4_t161: union F4_tool162
    add(f4_tool162.part)


with BuildPart() as f4_tool168:
    # F4_s169 → F4_t170 (new body)
    with BuildSketch(Plane.XY.offset(-1.5)):
        with BuildLine():
            ThreePointArc((-31, 2.5), (-31.7071067812, 2.7928932188), (-32, 3.5))
            Line((-32, 3.5), (-32, 2.5))
            Line((-32, 2.5), (-31, 2.5))
        make_face()
    extrude(amount=F4_T170_DEPTH)

    split(bisect_by=Plane(origin=(0, 0.75, -0.75), x_dir=(1, 0, 0), z_dir=(0, -0.7071067812, 0.7071067812)), keep=Keep.TOP)

    split(bisect_by=Plane(origin=(-16.5, 0, 16.5), x_dir=(0, 1, 0), z_dir=(0.7071067812, 0, -0.7071067812)), keep=Keep.TOP)


with BuildPart() as f1_27:
    add(f1_26.part)

    # F4_t167: union F4_tool168
    add(f4_tool168.part)


with BuildPart() as f4_tool174:
    # F4_s175 → F4_t176 (new body)
    with BuildSketch(Plane.XY.offset(-1.5)):
        with BuildLine():
            ThreePointArc((-31, 2.5), (-31.7071067812, 2.7928932188), (-32, 3.5))
            Line((-32, 3.5), (-32, 2.5))
            Line((-32, 2.5), (-31, 2.5))
        make_face()
    extrude(amount=F4_T176_DEPTH)

    split(bisect_by=Plane(origin=(0, 0.75, -0.75), x_dir=(1, 0, 0), z_dir=(0, -0.7071067812, 0.7071067812)), keep=Keep.TOP)

    split(bisect_by=Plane(origin=(-16.5, 0, 16.5), x_dir=(0, 1, 0), z_dir=(-0.7071067812, 0, 0.7071067812)), keep=Keep.TOP)

    split(bisect_by=Plane(origin=(0, 3.3, 3.3), x_dir=(1, 0, 0), z_dir=(0, -0.7071067812, -0.7071067812)), keep=Keep.TOP)

    split(bisect_by=Plane(origin=(-13.95, 0, -13.95), x_dir=(0, 1, 0), z_dir=(-0.7071067812, 0, -0.7071067812)), keep=Keep.TOP)


with BuildPart() as f1_28:
    add(f1_27.part)

    # F4_t173: union F4_tool174
    add(f4_tool174.part)


with BuildPart() as f4_tool182:
    # F4_s183 → F4_t184 (new body)
    with BuildSketch(Plane.XY.offset(-1.5)):
        with BuildLine():
            ThreePointArc((-31, 2.5), (-31.7071067812, 2.7928932188), (-32, 3.5))
            Line((-32, 3.5), (-32, 2.5))
            Line((-32, 2.5), (-31, 2.5))
        make_face()
    extrude(amount=F4_T184_DEPTH)

    split(bisect_by=Plane(origin=(0, 3.3, 3.3), x_dir=(1, 0, 0), z_dir=(0, 0.7071067812, 0.7071067812)), keep=Keep.TOP)

    split(bisect_by=Plane(origin=(-13.95, 0, -13.95), x_dir=(0, 1, 0), z_dir=(-0.7071067812, 0, -0.7071067812)), keep=Keep.TOP)


with BuildPart() as f1_29:
    add(f1_28.part)

    # F4_t181: union F4_tool182
    add(f4_tool182.part)


with BuildPart() as f4_tool188:
    # F4_s189 → F4_t190 (new body)
    with BuildSketch(Plane.XY.offset(-1.5)):
        with BuildLine():
            ThreePointArc((-31, 2.5), (-31.7071067812, 2.7928932188), (-32, 3.5))
            Line((-32, 3.5), (-32, 2.5))
            Line((-32, 2.5), (-31, 2.5))
        make_face()
    extrude(amount=F4_T190_DEPTH)

    split(bisect_by=Plane(origin=(0, 3.3, 3.3), x_dir=(1, 0, 0), z_dir=(0, -0.7071067812, -0.7071067812)), keep=Keep.TOP)

    split(bisect_by=Plane(origin=(-13.95, 0, -13.95), x_dir=(0, 1, 0), z_dir=(0.7071067812, 0, 0.7071067812)), keep=Keep.TOP)


with BuildPart() as f1_30:
    add(f1_29.part)

    # F4_t187: union F4_tool188
    add(f4_tool188.part)


with BuildPart() as f4_tool194:
    # F4_s195 → F4_t196 (new body)
    with BuildSketch(Plane.XY.offset(-1.5)):
        with BuildLine():
            ThreePointArc((-31, 4), (-31.7071067812, 3.7071067812), (-32, 3))
            Line((-32, 3), (-32, 4))
            Line((-32, 4), (-31, 4))
        make_face()
    extrude(amount=F4_T196_DEPTH)

    split(bisect_by=Plane(origin=(0, 2.5, 2.5), x_dir=(1, 0, 0), z_dir=(0, -0.7071067812, -0.7071067812)), keep=Keep.TOP)

    split(bisect_by=Plane(origin=(-16.5, 0, 16.5), x_dir=(0, 1, 0), z_dir=(-0.7071067812, 0, 0.7071067812)), keep=Keep.TOP)


with BuildPart() as f1_31:
    add(f1_30.part)

    # F4_t193: union F4_tool194
    add(f4_tool194.part)


with BuildPart() as f4_tool200:
    # F4_s201 → F4_t202 (new body)
    with BuildSketch(Plane.XY.offset(-1.5)):
        with BuildLine():
            ThreePointArc((-31, 4), (-31.7071067812, 3.7071067812), (-32, 3))
            Line((-32, 3), (-32, 4))
            Line((-32, 4), (-31, 4))
        make_face()
    extrude(amount=F4_T202_DEPTH)

    split(bisect_by=Plane(origin=(0, 2.5, 2.5), x_dir=(1, 0, 0), z_dir=(0, 0.7071067812, 0.7071067812)), keep=Keep.TOP)

    split(bisect_by=Plane(origin=(-16.5, 0, 16.5), x_dir=(0, 1, 0), z_dir=(0.7071067812, 0, -0.7071067812)), keep=Keep.TOP)


with BuildPart() as f1_32:
    add(f1_31.part)

    # F4_t199: union F4_tool200
    add(f4_tool200.part)


with BuildPart() as f4_tool206:
    # F4_s207 → F4_t208 (new body)
    with BuildSketch(Plane.XY.offset(-1.5)):
        with BuildLine():
            ThreePointArc((-31, 4), (-31.7071067812, 3.7071067812), (-32, 3))
            Line((-32, 3), (-32, 4))
            Line((-32, 4), (-31, 4))
        make_face()
    extrude(amount=F4_T208_DEPTH)

    split(bisect_by=Plane(origin=(0, 2.5, 2.5), x_dir=(1, 0, 0), z_dir=(0, 0.7071067812, 0.7071067812)), keep=Keep.TOP)

    split(bisect_by=Plane(origin=(-16.5, 0, 16.5), x_dir=(0, 1, 0), z_dir=(-0.7071067812, 0, 0.7071067812)), keep=Keep.TOP)

    split(bisect_by=Plane(origin=(0, -0.05, 0.05), x_dir=(1, 0, 0), z_dir=(0, 0.7071067812, -0.7071067812)), keep=Keep.TOP)

    split(bisect_by=Plane(origin=(-13.95, 0, -13.95), x_dir=(0, 1, 0), z_dir=(-0.7071067812, 0, -0.7071067812)), keep=Keep.TOP)


with BuildPart() as f1_33:
    add(f1_32.part)

    # F4_t205: union F4_tool206
    add(f4_tool206.part)


with BuildPart() as f4_tool214:
    # F4_s215 → F4_t216 (new body)
    with BuildSketch(Plane.XY.offset(-1.5)):
        with BuildLine():
            ThreePointArc((-31, 4), (-31.7071067812, 3.7071067812), (-32, 3))
            Line((-32, 3), (-32, 4))
            Line((-32, 4), (-31, 4))
        make_face()
    extrude(amount=F4_T216_DEPTH)

    split(bisect_by=Plane(origin=(0, -0.05, 0.05), x_dir=(1, 0, 0), z_dir=(0, -0.7071067812, 0.7071067812)), keep=Keep.TOP)

    split(bisect_by=Plane(origin=(-13.95, 0, -13.95), x_dir=(0, 1, 0), z_dir=(-0.7071067812, 0, -0.7071067812)), keep=Keep.TOP)


with BuildPart() as f1_34:
    add(f1_33.part)

    # F4_t213: union F4_tool214
    add(f4_tool214.part)


with BuildPart() as f4_tool220:
    # F4_s221 → F4_t222 (new body)
    with BuildSketch(Plane.XY.offset(-1.5)):
        with BuildLine():
            ThreePointArc((-31, 4), (-31.7071067812, 3.7071067812), (-32, 3))
            Line((-32, 3), (-32, 4))
            Line((-32, 4), (-31, 4))
        make_face()
    extrude(amount=F4_T222_DEPTH)

    split(bisect_by=Plane(origin=(0, -0.05, 0.05), x_dir=(1, 0, 0), z_dir=(0, 0.7071067812, -0.7071067812)), keep=Keep.TOP)

    split(bisect_by=Plane(origin=(-13.95, 0, -13.95), x_dir=(0, 1, 0), z_dir=(0.7071067812, 0, 0.7071067812)), keep=Keep.TOP)


with BuildPart() as f1_35:
    add(f1_34.part)

    # F4_t219: union F4_tool220
    add(f4_tool220.part)


with BuildPart() as f4_tool226:
    # F4_s227 → F4_t228 (new body)
    with BuildSketch(Plane.XY.offset(-1.5)):
        with BuildLine():
            ThreePointArc((-31, 0), (-31.7071067812, -0.2928932188), (-32, -1))
            Line((-32, -1), (-32, 0))
            Line((-32, 0), (-31, 0))
        make_face()
    extrude(amount=F4_T228_DEPTH)

    split(bisect_by=Plane(origin=(0, 0.5, 0.5), x_dir=(1, 0, 0), z_dir=(0, -0.7071067812, -0.7071067812)), keep=Keep.TOP)

    split(bisect_by=Plane(origin=(-16.5, 0, 16.5), x_dir=(0, 1, 0), z_dir=(-0.7071067812, 0, 0.7071067812)), keep=Keep.TOP)


with BuildPart() as f1_36:
    add(f1_35.part)

    # F4_t225: union F4_tool226
    add(f4_tool226.part)


with BuildPart() as f4_tool232:
    # F4_s233 → F4_t234 (new body)
    with BuildSketch(Plane.XY.offset(-1.5)):
        with BuildLine():
            ThreePointArc((-31, 0), (-31.7071067812, -0.2928932188), (-32, -1))
            Line((-32, -1), (-32, 0))
            Line((-32, 0), (-31, 0))
        make_face()
    extrude(amount=F4_T234_DEPTH)

    split(bisect_by=Plane(origin=(0, 0.5, 0.5), x_dir=(1, 0, 0), z_dir=(0, 0.7071067812, 0.7071067812)), keep=Keep.TOP)

    split(bisect_by=Plane(origin=(-16.5, 0, 16.5), x_dir=(0, 1, 0), z_dir=(0.7071067812, 0, -0.7071067812)), keep=Keep.TOP)


with BuildPart() as f1_37:
    add(f1_36.part)

    # F4_t231: union F4_tool232
    add(f4_tool232.part)


with BuildPart() as f4_tool238:
    # F4_s239 → F4_t240 (new body)
    with BuildSketch(Plane.XY.offset(-1.5)):
        with BuildLine():
            ThreePointArc((-31, 0), (-31.7071067812, -0.2928932188), (-32, -1))
            Line((-32, -1), (-32, 0))
            Line((-32, 0), (-31, 0))
        make_face()
    extrude(amount=F4_T240_DEPTH)

    split(bisect_by=Plane(origin=(0, 0.5, 0.5), x_dir=(1, 0, 0), z_dir=(0, 0.7071067812, 0.7071067812)), keep=Keep.TOP)

    split(bisect_by=Plane(origin=(-16.5, 0, 16.5), x_dir=(0, 1, 0), z_dir=(-0.7071067812, 0, 0.7071067812)), keep=Keep.TOP)

    split(bisect_by=Plane(origin=(0, -2.05, 2.05), x_dir=(1, 0, 0), z_dir=(0, 0.7071067812, -0.7071067812)), keep=Keep.TOP)

    split(bisect_by=Plane(origin=(-13.95, 0, -13.95), x_dir=(0, 1, 0), z_dir=(-0.7071067812, 0, -0.7071067812)), keep=Keep.TOP)


with BuildPart() as f1_38:
    add(f1_37.part)

    # F4_t237: union F4_tool238
    add(f4_tool238.part)


with BuildPart() as f4_tool246:
    # F4_s247 → F4_t248 (new body)
    with BuildSketch(Plane.XY.offset(-1.5)):
        with BuildLine():
            ThreePointArc((-31, 0), (-31.7071067812, -0.2928932188), (-32, -1))
            Line((-32, -1), (-32, 0))
            Line((-32, 0), (-31, 0))
        make_face()
    extrude(amount=F4_T248_DEPTH)

    split(bisect_by=Plane(origin=(0, -2.05, 2.05), x_dir=(1, 0, 0), z_dir=(0, -0.7071067812, 0.7071067812)), keep=Keep.TOP)

    split(bisect_by=Plane(origin=(-13.95, 0, -13.95), x_dir=(0, 1, 0), z_dir=(-0.7071067812, 0, -0.7071067812)), keep=Keep.TOP)


with BuildPart() as f1_39:
    add(f1_38.part)

    # F4_t245: union F4_tool246
    add(f4_tool246.part)


with BuildPart() as f4_tool252:
    # F4_s253 → F4_t254 (new body)
    with BuildSketch(Plane.XY.offset(-1.5)):
        with BuildLine():
            ThreePointArc((-31, 0), (-31.7071067812, -0.2928932188), (-32, -1))
            Line((-32, -1), (-32, 0))
            Line((-32, 0), (-31, 0))
        make_face()
    extrude(amount=F4_T254_DEPTH)

    split(bisect_by=Plane(origin=(0, -2.05, 2.05), x_dir=(1, 0, 0), z_dir=(0, 0.7071067812, -0.7071067812)), keep=Keep.TOP)

    split(bisect_by=Plane(origin=(-13.95, 0, -13.95), x_dir=(0, 1, 0), z_dir=(0.7071067812, 0, 0.7071067812)), keep=Keep.TOP)


with BuildPart() as f1_40:
    add(f1_39.part)

    # F4_t251: union F4_tool252
    add(f4_tool252.part)


solid = f1_40.part
